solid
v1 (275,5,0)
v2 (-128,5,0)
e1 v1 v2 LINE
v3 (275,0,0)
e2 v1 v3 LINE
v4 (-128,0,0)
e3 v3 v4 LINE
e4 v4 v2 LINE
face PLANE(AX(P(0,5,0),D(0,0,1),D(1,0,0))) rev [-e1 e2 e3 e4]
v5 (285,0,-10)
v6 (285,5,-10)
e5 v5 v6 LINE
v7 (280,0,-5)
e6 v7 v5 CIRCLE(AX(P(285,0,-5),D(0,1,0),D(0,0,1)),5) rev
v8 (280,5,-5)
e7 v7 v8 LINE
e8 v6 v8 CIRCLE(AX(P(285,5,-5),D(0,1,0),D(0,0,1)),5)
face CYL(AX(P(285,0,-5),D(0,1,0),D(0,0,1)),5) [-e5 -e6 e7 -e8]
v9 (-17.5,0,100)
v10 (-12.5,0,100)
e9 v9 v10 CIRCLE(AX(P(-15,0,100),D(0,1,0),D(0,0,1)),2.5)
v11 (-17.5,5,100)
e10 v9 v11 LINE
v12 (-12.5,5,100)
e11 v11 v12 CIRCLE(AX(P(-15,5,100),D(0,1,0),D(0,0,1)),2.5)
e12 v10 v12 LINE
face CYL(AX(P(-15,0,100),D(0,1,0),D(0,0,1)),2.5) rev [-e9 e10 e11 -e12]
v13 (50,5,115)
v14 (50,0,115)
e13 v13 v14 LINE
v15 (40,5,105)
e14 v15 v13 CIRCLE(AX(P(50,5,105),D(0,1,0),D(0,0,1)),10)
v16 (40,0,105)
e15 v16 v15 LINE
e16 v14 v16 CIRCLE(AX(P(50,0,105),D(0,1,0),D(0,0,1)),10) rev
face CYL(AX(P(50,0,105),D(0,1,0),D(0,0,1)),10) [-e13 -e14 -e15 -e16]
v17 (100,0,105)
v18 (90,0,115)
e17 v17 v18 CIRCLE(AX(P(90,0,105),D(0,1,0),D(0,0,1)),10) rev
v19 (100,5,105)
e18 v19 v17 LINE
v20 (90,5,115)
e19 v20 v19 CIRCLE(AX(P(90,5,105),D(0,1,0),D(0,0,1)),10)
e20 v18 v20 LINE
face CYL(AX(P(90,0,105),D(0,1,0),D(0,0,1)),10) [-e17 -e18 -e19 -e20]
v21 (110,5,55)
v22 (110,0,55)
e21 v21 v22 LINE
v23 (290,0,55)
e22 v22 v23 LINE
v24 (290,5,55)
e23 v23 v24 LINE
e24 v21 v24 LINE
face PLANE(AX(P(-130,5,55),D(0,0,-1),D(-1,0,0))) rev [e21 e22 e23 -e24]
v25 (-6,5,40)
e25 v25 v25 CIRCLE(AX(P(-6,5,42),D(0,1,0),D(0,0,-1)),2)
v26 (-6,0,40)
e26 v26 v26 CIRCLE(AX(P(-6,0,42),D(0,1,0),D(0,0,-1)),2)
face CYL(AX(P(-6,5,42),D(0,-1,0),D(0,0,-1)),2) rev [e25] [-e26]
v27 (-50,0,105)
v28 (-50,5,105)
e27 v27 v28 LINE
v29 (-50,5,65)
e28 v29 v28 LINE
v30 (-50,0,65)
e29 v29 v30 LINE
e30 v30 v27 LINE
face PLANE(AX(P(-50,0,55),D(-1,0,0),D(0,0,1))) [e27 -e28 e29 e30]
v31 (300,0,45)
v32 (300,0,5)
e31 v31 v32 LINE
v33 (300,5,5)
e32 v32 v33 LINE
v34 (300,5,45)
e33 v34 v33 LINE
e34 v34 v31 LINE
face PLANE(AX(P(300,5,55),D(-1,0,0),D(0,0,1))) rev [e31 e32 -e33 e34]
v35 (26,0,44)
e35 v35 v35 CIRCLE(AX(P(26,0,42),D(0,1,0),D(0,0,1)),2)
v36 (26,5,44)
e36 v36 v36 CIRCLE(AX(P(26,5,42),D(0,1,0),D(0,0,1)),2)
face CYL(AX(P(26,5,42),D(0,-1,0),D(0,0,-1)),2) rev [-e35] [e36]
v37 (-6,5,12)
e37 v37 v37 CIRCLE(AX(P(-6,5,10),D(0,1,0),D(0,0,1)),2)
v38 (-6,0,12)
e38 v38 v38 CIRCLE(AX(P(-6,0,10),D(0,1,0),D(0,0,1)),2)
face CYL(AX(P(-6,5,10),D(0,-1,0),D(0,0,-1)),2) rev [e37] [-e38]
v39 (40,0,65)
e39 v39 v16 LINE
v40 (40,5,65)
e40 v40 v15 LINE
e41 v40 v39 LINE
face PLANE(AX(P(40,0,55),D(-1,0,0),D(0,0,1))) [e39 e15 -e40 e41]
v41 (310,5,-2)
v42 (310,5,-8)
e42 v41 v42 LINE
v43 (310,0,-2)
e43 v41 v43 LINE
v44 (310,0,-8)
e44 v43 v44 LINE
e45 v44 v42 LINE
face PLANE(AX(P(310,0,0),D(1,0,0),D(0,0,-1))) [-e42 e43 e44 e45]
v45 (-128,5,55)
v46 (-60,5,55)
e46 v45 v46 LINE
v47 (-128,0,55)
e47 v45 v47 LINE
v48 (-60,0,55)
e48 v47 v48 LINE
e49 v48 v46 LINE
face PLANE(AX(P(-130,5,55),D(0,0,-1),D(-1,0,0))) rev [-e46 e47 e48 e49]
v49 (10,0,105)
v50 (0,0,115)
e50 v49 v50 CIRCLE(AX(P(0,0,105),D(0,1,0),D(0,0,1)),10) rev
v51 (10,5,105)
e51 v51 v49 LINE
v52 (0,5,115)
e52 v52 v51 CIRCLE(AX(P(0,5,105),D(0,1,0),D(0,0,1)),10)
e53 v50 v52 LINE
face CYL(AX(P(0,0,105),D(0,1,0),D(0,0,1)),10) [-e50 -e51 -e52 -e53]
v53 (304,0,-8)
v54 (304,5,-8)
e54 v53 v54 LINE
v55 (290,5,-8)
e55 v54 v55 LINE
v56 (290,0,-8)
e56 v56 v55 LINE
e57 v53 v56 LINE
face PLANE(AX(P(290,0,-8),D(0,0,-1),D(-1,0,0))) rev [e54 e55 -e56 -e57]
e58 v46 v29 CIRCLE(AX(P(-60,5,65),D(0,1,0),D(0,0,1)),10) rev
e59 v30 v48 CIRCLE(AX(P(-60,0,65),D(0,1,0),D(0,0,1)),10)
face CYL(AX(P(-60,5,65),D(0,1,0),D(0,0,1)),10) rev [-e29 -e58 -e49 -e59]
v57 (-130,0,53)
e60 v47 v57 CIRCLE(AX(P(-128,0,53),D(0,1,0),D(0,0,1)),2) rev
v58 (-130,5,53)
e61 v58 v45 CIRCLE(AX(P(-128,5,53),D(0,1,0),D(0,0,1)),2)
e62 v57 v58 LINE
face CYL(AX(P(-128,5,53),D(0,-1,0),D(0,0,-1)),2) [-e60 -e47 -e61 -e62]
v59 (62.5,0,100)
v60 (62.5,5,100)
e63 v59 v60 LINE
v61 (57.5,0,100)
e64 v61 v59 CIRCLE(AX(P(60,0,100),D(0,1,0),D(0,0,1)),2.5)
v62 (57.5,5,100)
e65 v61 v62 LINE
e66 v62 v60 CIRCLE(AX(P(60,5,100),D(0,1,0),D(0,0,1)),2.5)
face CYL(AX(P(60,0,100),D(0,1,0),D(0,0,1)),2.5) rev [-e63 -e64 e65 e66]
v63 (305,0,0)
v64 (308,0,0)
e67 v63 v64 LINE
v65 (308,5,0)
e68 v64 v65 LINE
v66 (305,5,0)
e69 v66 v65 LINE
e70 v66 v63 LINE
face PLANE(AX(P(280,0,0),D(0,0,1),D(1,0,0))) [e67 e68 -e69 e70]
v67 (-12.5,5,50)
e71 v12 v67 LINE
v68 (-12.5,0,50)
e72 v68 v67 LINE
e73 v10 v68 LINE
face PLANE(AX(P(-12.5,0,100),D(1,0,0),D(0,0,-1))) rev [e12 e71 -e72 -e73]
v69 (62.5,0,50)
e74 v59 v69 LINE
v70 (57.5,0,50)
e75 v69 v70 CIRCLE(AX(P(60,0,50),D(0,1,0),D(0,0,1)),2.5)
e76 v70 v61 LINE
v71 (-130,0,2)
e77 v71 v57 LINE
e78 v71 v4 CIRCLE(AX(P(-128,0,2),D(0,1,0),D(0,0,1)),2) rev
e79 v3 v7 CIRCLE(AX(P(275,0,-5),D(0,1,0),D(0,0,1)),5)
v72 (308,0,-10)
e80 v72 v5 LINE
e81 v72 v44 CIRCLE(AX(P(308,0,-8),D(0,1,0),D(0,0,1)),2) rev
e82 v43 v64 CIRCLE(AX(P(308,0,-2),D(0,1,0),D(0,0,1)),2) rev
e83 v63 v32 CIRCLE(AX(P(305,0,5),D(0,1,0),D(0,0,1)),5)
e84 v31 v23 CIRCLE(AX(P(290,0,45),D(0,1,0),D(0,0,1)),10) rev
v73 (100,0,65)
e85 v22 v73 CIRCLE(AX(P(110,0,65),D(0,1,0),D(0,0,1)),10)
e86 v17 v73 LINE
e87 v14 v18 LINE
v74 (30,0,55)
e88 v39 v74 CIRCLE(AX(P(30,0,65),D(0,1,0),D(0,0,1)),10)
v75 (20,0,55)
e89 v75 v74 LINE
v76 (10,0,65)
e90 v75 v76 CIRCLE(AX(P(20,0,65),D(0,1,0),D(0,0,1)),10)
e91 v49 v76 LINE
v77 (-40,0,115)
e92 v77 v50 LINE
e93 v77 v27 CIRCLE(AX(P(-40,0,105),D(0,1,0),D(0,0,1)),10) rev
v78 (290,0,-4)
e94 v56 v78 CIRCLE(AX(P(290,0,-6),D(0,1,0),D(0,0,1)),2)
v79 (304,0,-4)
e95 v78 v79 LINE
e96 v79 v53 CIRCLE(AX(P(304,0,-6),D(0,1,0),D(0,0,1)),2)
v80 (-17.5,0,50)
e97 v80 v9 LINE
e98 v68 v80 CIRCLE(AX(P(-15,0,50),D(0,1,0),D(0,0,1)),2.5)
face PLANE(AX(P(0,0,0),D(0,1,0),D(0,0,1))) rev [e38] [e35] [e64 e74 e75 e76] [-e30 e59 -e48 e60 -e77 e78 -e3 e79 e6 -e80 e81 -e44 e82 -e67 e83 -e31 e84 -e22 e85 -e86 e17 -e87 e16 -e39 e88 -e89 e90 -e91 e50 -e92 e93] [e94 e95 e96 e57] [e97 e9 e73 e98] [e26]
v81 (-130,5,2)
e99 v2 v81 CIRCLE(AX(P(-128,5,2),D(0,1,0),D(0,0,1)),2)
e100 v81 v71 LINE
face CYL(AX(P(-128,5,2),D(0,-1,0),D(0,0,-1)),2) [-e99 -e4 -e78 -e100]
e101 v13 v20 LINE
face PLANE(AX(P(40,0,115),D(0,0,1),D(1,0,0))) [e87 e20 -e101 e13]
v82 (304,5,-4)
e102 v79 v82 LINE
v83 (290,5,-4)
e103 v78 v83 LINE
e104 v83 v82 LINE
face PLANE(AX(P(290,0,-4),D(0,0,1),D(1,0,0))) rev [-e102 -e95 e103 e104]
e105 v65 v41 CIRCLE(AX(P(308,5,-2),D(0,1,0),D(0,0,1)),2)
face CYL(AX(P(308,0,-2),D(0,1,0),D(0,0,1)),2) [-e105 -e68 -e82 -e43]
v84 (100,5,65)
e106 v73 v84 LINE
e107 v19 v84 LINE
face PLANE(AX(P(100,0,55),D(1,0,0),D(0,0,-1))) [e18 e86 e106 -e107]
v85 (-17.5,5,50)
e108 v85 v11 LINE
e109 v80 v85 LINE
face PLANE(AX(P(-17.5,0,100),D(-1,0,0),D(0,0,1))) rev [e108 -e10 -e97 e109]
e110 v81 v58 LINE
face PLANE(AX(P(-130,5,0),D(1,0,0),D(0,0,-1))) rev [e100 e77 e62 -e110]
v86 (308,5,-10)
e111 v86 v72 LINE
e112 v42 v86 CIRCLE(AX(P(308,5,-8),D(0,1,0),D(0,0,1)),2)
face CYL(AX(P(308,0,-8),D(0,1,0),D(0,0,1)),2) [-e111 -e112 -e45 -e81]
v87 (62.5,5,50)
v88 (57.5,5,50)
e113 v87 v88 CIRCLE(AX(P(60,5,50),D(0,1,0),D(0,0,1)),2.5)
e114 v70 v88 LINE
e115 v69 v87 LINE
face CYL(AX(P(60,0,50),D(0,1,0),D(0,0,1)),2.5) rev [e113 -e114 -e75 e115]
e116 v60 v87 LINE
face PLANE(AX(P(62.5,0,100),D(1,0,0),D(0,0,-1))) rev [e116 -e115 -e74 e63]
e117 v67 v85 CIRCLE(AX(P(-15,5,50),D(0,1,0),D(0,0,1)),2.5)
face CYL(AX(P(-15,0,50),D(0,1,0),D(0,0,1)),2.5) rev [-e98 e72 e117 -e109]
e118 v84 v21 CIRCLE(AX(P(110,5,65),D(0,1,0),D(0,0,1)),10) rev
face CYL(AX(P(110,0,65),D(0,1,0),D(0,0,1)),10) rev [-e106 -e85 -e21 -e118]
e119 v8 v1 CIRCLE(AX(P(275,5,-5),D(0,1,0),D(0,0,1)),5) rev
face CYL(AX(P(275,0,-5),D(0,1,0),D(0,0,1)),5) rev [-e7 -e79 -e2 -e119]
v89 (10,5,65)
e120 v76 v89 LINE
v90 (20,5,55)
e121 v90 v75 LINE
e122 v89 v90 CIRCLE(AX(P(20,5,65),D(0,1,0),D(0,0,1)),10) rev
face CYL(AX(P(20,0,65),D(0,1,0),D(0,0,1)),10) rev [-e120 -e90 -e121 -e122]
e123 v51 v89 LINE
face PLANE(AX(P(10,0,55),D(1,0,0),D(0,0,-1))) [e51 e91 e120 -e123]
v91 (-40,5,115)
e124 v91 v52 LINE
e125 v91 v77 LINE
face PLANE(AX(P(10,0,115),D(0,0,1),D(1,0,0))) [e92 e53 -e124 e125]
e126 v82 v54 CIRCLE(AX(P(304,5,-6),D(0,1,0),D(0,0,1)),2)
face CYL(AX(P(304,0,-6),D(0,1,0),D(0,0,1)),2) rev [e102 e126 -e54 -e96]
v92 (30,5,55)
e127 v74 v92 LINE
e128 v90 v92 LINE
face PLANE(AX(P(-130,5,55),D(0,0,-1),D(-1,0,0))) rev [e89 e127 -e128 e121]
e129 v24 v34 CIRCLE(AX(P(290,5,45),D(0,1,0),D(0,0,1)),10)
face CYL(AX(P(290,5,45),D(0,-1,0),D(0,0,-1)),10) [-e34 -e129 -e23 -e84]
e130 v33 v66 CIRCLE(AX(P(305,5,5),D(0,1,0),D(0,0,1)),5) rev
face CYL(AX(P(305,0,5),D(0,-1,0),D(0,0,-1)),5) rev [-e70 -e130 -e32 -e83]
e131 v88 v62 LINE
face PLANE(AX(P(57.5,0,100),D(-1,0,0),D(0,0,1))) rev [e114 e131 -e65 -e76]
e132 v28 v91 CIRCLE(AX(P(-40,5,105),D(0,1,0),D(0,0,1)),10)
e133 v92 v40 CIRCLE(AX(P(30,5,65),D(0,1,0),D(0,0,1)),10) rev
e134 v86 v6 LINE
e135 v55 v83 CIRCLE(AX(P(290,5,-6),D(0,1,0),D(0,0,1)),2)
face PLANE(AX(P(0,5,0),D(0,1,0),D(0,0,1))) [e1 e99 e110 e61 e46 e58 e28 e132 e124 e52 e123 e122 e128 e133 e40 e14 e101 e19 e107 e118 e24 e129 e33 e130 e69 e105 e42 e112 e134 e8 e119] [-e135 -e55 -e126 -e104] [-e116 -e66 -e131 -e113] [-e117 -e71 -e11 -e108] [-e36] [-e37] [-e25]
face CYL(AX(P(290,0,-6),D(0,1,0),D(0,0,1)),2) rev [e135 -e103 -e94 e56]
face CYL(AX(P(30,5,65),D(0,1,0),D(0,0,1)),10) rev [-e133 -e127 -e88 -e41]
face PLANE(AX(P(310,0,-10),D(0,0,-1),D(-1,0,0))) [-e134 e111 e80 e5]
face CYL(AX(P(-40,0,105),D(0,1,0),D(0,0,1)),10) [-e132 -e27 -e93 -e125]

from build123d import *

# Parameters (mm, degrees)
SKETCH1_R           = 2
BOSS_EXTRUDE1_DEPTH = 5
SKETCH2_W           = 30
SKETCH2_H           = 10
BOSS_EXTRUDE2_DEPTH = 5
CUT_EXTRUDE1_DEPTH  = 315.880929877
FILLET1_R           = 5
SKETCH4_W           = 60
SKETCH4_H           = 60
BOSS_EXTRUDE3_DEPTH = 5
FILLET2_R           = 10
FILLET3_R           = 10
FILLET4_R           = 2
FILLET5_R           = 2
FILLET6_R           = 10
CUT_EXTRUDE2_DEPTH  = 331.681115276


with BuildPart() as part:
    # Sketch1 → Boss-Extrude1 (new body)
    with BuildSketch(Plane(origin=(0, 0, 0), x_dir=(1, 0, 0), z_dir=(0, 1, 0))):
        Polygon((0, 0), (-130, 0), (-130, -55), (300, -55), (300, 0), align=None)
        with Locations(Location((-6, -10, 0), (0, 0, 270))):
            Circle(SKETCH1_R, mode=Mode.SUBTRACT)
        with Locations(Location((-6, -42, 0), (0, 0, 90))):
            Circle(SKETCH1_R, mode=Mode.SUBTRACT)
        with Locations(Location((26, -42, 0), (0, 0, 270))):
            Circle(SKETCH1_R, mode=Mode.SUBTRACT)
    extrude(amount=BOSS_EXTRUDE1_DEPTH)

    # Sketch2 → Boss-Extrude2 (add)
    with BuildSketch(Plane(origin=(0, 5, 0), x_dir=(1, 0, 0), z_dir=(0, 1, 0))):
        with Locations((295, 5)):
            Rectangle(SKETCH2_W, SKETCH2_H)
    extrude(amount=-BOSS_EXTRUDE2_DEPTH)

    # Sketch3 → Cut-Extrude1 (cut, through all)
    with BuildSketch(Plane(origin=(0, 5, 0), x_dir=(1, 0, 0), z_dir=(0, 1, 0))):
        with BuildLine():
            Line((290, 8), (304, 8))
            ThreePointArc((304, 8), (306, 6), (304, 4))
            Line((304, 4), (290, 4))
            ThreePointArc((290, 4), (288, 6), (290, 8))
        make_face()
    extrude(amount=-CUT_EXTRUDE1_DEPTH, mode=Mode.SUBTRACT)

    # Fillet1
    fillet1_edges = [part.edges().sort_by_distance(p)[0] for p in [
        (300, 2.5, 0),
        (280, 2.5, -10),
        (280, 2.5, 0),
    ]]
    fillet(fillet1_edges, radius=FILLET1_R - 0.0001)  # a hair under: the kernel refuses the full size

    # Sketch4 → Boss-Extrude3 (add)
    with BuildSketch(Plane(origin=(0, 5, 0), x_dir=(1, 0, 0), z_dir=(0, 1, 0))):
        with Locations((70, -85)):
            Rectangle(SKETCH4_W, SKETCH4_H)
        with Locations((-20, -85)):
            Rectangle(SKETCH4_W, SKETCH4_H)
    extrude(amount=-BOSS_EXTRUDE3_DEPTH)

    # Fillet2
    fillet2_edges = [part.edges().sort_by_distance(p)[0] for p in [
        (40, 2.5, 55),
        (100, 2.5, 55),
        (100, 2.5, 115),
        (40, 2.5, 115),
    ]]
    fillet(fillet2_edges, radius=FILLET2_R)

    # Fillet3
    fillet3_edges = [part.edges().sort_by_distance(p)[0] for p in [
        (300, 2.5, 55),
    ]]
    fillet(fillet3_edges, radius=FILLET3_R)

    # Fillet4
    fillet4_edges = [part.edges().sort_by_distance(p)[0] for p in [
        (310, 2.5, -10),
        (310, 2.5, 0),
    ]]
    fillet(fillet4_edges, radius=FILLET4_R)

    # Fillet5
    fillet5_edges = [part.edges().sort_by_distance(p)[0] for p in [
        (-130, 2.5, 55),
        (-130, 2.5, 0),
    ]]
    fillet(fillet5_edges, radius=FILLET5_R)

    # Fillet6
    fillet6_edges = [part.edges().sort_by_distance(p)[0] for p in [
        (10, 2.5, 55),
        (10, 2.5, 115),
        (-50, 2.5, 115),
        (-50, 2.5, 55),
    ]]
    fillet(fillet6_edges, radius=FILLET6_R)

    # Sketch6 → Cut-Extrude2 (cut, through all)
    with BuildSketch(Plane(origin=(0, 5, 0), x_dir=(1, 0, 0), z_dir=(0, 1, 0))):
        with BuildLine():
            Line((-17.5, -100), (-17.5, -50))
            ThreePointArc((-17.5, -50), (-15, -47.5), (-12.5, -50))
            Line((-12.5, -50), (-12.5, -100))
            ThreePointArc((-12.5, -100), (-15, -102.5), (-17.5, -100))
        make_face()
        with BuildLine():
            Line((57.5, -100), (57.5, -50))
            ThreePointArc((57.5, -50), (60, -47.5), (62.5, -50))
            Line((62.5, -50), (62.5, -100))
            ThreePointArc((62.5, -100), (60, -102.5), (57.5, -100))
        make_face()
    extrude(amount=-CUT_EXTRUDE2_DEPTH, mode=Mode.SUBTRACT)


solid = part.part
